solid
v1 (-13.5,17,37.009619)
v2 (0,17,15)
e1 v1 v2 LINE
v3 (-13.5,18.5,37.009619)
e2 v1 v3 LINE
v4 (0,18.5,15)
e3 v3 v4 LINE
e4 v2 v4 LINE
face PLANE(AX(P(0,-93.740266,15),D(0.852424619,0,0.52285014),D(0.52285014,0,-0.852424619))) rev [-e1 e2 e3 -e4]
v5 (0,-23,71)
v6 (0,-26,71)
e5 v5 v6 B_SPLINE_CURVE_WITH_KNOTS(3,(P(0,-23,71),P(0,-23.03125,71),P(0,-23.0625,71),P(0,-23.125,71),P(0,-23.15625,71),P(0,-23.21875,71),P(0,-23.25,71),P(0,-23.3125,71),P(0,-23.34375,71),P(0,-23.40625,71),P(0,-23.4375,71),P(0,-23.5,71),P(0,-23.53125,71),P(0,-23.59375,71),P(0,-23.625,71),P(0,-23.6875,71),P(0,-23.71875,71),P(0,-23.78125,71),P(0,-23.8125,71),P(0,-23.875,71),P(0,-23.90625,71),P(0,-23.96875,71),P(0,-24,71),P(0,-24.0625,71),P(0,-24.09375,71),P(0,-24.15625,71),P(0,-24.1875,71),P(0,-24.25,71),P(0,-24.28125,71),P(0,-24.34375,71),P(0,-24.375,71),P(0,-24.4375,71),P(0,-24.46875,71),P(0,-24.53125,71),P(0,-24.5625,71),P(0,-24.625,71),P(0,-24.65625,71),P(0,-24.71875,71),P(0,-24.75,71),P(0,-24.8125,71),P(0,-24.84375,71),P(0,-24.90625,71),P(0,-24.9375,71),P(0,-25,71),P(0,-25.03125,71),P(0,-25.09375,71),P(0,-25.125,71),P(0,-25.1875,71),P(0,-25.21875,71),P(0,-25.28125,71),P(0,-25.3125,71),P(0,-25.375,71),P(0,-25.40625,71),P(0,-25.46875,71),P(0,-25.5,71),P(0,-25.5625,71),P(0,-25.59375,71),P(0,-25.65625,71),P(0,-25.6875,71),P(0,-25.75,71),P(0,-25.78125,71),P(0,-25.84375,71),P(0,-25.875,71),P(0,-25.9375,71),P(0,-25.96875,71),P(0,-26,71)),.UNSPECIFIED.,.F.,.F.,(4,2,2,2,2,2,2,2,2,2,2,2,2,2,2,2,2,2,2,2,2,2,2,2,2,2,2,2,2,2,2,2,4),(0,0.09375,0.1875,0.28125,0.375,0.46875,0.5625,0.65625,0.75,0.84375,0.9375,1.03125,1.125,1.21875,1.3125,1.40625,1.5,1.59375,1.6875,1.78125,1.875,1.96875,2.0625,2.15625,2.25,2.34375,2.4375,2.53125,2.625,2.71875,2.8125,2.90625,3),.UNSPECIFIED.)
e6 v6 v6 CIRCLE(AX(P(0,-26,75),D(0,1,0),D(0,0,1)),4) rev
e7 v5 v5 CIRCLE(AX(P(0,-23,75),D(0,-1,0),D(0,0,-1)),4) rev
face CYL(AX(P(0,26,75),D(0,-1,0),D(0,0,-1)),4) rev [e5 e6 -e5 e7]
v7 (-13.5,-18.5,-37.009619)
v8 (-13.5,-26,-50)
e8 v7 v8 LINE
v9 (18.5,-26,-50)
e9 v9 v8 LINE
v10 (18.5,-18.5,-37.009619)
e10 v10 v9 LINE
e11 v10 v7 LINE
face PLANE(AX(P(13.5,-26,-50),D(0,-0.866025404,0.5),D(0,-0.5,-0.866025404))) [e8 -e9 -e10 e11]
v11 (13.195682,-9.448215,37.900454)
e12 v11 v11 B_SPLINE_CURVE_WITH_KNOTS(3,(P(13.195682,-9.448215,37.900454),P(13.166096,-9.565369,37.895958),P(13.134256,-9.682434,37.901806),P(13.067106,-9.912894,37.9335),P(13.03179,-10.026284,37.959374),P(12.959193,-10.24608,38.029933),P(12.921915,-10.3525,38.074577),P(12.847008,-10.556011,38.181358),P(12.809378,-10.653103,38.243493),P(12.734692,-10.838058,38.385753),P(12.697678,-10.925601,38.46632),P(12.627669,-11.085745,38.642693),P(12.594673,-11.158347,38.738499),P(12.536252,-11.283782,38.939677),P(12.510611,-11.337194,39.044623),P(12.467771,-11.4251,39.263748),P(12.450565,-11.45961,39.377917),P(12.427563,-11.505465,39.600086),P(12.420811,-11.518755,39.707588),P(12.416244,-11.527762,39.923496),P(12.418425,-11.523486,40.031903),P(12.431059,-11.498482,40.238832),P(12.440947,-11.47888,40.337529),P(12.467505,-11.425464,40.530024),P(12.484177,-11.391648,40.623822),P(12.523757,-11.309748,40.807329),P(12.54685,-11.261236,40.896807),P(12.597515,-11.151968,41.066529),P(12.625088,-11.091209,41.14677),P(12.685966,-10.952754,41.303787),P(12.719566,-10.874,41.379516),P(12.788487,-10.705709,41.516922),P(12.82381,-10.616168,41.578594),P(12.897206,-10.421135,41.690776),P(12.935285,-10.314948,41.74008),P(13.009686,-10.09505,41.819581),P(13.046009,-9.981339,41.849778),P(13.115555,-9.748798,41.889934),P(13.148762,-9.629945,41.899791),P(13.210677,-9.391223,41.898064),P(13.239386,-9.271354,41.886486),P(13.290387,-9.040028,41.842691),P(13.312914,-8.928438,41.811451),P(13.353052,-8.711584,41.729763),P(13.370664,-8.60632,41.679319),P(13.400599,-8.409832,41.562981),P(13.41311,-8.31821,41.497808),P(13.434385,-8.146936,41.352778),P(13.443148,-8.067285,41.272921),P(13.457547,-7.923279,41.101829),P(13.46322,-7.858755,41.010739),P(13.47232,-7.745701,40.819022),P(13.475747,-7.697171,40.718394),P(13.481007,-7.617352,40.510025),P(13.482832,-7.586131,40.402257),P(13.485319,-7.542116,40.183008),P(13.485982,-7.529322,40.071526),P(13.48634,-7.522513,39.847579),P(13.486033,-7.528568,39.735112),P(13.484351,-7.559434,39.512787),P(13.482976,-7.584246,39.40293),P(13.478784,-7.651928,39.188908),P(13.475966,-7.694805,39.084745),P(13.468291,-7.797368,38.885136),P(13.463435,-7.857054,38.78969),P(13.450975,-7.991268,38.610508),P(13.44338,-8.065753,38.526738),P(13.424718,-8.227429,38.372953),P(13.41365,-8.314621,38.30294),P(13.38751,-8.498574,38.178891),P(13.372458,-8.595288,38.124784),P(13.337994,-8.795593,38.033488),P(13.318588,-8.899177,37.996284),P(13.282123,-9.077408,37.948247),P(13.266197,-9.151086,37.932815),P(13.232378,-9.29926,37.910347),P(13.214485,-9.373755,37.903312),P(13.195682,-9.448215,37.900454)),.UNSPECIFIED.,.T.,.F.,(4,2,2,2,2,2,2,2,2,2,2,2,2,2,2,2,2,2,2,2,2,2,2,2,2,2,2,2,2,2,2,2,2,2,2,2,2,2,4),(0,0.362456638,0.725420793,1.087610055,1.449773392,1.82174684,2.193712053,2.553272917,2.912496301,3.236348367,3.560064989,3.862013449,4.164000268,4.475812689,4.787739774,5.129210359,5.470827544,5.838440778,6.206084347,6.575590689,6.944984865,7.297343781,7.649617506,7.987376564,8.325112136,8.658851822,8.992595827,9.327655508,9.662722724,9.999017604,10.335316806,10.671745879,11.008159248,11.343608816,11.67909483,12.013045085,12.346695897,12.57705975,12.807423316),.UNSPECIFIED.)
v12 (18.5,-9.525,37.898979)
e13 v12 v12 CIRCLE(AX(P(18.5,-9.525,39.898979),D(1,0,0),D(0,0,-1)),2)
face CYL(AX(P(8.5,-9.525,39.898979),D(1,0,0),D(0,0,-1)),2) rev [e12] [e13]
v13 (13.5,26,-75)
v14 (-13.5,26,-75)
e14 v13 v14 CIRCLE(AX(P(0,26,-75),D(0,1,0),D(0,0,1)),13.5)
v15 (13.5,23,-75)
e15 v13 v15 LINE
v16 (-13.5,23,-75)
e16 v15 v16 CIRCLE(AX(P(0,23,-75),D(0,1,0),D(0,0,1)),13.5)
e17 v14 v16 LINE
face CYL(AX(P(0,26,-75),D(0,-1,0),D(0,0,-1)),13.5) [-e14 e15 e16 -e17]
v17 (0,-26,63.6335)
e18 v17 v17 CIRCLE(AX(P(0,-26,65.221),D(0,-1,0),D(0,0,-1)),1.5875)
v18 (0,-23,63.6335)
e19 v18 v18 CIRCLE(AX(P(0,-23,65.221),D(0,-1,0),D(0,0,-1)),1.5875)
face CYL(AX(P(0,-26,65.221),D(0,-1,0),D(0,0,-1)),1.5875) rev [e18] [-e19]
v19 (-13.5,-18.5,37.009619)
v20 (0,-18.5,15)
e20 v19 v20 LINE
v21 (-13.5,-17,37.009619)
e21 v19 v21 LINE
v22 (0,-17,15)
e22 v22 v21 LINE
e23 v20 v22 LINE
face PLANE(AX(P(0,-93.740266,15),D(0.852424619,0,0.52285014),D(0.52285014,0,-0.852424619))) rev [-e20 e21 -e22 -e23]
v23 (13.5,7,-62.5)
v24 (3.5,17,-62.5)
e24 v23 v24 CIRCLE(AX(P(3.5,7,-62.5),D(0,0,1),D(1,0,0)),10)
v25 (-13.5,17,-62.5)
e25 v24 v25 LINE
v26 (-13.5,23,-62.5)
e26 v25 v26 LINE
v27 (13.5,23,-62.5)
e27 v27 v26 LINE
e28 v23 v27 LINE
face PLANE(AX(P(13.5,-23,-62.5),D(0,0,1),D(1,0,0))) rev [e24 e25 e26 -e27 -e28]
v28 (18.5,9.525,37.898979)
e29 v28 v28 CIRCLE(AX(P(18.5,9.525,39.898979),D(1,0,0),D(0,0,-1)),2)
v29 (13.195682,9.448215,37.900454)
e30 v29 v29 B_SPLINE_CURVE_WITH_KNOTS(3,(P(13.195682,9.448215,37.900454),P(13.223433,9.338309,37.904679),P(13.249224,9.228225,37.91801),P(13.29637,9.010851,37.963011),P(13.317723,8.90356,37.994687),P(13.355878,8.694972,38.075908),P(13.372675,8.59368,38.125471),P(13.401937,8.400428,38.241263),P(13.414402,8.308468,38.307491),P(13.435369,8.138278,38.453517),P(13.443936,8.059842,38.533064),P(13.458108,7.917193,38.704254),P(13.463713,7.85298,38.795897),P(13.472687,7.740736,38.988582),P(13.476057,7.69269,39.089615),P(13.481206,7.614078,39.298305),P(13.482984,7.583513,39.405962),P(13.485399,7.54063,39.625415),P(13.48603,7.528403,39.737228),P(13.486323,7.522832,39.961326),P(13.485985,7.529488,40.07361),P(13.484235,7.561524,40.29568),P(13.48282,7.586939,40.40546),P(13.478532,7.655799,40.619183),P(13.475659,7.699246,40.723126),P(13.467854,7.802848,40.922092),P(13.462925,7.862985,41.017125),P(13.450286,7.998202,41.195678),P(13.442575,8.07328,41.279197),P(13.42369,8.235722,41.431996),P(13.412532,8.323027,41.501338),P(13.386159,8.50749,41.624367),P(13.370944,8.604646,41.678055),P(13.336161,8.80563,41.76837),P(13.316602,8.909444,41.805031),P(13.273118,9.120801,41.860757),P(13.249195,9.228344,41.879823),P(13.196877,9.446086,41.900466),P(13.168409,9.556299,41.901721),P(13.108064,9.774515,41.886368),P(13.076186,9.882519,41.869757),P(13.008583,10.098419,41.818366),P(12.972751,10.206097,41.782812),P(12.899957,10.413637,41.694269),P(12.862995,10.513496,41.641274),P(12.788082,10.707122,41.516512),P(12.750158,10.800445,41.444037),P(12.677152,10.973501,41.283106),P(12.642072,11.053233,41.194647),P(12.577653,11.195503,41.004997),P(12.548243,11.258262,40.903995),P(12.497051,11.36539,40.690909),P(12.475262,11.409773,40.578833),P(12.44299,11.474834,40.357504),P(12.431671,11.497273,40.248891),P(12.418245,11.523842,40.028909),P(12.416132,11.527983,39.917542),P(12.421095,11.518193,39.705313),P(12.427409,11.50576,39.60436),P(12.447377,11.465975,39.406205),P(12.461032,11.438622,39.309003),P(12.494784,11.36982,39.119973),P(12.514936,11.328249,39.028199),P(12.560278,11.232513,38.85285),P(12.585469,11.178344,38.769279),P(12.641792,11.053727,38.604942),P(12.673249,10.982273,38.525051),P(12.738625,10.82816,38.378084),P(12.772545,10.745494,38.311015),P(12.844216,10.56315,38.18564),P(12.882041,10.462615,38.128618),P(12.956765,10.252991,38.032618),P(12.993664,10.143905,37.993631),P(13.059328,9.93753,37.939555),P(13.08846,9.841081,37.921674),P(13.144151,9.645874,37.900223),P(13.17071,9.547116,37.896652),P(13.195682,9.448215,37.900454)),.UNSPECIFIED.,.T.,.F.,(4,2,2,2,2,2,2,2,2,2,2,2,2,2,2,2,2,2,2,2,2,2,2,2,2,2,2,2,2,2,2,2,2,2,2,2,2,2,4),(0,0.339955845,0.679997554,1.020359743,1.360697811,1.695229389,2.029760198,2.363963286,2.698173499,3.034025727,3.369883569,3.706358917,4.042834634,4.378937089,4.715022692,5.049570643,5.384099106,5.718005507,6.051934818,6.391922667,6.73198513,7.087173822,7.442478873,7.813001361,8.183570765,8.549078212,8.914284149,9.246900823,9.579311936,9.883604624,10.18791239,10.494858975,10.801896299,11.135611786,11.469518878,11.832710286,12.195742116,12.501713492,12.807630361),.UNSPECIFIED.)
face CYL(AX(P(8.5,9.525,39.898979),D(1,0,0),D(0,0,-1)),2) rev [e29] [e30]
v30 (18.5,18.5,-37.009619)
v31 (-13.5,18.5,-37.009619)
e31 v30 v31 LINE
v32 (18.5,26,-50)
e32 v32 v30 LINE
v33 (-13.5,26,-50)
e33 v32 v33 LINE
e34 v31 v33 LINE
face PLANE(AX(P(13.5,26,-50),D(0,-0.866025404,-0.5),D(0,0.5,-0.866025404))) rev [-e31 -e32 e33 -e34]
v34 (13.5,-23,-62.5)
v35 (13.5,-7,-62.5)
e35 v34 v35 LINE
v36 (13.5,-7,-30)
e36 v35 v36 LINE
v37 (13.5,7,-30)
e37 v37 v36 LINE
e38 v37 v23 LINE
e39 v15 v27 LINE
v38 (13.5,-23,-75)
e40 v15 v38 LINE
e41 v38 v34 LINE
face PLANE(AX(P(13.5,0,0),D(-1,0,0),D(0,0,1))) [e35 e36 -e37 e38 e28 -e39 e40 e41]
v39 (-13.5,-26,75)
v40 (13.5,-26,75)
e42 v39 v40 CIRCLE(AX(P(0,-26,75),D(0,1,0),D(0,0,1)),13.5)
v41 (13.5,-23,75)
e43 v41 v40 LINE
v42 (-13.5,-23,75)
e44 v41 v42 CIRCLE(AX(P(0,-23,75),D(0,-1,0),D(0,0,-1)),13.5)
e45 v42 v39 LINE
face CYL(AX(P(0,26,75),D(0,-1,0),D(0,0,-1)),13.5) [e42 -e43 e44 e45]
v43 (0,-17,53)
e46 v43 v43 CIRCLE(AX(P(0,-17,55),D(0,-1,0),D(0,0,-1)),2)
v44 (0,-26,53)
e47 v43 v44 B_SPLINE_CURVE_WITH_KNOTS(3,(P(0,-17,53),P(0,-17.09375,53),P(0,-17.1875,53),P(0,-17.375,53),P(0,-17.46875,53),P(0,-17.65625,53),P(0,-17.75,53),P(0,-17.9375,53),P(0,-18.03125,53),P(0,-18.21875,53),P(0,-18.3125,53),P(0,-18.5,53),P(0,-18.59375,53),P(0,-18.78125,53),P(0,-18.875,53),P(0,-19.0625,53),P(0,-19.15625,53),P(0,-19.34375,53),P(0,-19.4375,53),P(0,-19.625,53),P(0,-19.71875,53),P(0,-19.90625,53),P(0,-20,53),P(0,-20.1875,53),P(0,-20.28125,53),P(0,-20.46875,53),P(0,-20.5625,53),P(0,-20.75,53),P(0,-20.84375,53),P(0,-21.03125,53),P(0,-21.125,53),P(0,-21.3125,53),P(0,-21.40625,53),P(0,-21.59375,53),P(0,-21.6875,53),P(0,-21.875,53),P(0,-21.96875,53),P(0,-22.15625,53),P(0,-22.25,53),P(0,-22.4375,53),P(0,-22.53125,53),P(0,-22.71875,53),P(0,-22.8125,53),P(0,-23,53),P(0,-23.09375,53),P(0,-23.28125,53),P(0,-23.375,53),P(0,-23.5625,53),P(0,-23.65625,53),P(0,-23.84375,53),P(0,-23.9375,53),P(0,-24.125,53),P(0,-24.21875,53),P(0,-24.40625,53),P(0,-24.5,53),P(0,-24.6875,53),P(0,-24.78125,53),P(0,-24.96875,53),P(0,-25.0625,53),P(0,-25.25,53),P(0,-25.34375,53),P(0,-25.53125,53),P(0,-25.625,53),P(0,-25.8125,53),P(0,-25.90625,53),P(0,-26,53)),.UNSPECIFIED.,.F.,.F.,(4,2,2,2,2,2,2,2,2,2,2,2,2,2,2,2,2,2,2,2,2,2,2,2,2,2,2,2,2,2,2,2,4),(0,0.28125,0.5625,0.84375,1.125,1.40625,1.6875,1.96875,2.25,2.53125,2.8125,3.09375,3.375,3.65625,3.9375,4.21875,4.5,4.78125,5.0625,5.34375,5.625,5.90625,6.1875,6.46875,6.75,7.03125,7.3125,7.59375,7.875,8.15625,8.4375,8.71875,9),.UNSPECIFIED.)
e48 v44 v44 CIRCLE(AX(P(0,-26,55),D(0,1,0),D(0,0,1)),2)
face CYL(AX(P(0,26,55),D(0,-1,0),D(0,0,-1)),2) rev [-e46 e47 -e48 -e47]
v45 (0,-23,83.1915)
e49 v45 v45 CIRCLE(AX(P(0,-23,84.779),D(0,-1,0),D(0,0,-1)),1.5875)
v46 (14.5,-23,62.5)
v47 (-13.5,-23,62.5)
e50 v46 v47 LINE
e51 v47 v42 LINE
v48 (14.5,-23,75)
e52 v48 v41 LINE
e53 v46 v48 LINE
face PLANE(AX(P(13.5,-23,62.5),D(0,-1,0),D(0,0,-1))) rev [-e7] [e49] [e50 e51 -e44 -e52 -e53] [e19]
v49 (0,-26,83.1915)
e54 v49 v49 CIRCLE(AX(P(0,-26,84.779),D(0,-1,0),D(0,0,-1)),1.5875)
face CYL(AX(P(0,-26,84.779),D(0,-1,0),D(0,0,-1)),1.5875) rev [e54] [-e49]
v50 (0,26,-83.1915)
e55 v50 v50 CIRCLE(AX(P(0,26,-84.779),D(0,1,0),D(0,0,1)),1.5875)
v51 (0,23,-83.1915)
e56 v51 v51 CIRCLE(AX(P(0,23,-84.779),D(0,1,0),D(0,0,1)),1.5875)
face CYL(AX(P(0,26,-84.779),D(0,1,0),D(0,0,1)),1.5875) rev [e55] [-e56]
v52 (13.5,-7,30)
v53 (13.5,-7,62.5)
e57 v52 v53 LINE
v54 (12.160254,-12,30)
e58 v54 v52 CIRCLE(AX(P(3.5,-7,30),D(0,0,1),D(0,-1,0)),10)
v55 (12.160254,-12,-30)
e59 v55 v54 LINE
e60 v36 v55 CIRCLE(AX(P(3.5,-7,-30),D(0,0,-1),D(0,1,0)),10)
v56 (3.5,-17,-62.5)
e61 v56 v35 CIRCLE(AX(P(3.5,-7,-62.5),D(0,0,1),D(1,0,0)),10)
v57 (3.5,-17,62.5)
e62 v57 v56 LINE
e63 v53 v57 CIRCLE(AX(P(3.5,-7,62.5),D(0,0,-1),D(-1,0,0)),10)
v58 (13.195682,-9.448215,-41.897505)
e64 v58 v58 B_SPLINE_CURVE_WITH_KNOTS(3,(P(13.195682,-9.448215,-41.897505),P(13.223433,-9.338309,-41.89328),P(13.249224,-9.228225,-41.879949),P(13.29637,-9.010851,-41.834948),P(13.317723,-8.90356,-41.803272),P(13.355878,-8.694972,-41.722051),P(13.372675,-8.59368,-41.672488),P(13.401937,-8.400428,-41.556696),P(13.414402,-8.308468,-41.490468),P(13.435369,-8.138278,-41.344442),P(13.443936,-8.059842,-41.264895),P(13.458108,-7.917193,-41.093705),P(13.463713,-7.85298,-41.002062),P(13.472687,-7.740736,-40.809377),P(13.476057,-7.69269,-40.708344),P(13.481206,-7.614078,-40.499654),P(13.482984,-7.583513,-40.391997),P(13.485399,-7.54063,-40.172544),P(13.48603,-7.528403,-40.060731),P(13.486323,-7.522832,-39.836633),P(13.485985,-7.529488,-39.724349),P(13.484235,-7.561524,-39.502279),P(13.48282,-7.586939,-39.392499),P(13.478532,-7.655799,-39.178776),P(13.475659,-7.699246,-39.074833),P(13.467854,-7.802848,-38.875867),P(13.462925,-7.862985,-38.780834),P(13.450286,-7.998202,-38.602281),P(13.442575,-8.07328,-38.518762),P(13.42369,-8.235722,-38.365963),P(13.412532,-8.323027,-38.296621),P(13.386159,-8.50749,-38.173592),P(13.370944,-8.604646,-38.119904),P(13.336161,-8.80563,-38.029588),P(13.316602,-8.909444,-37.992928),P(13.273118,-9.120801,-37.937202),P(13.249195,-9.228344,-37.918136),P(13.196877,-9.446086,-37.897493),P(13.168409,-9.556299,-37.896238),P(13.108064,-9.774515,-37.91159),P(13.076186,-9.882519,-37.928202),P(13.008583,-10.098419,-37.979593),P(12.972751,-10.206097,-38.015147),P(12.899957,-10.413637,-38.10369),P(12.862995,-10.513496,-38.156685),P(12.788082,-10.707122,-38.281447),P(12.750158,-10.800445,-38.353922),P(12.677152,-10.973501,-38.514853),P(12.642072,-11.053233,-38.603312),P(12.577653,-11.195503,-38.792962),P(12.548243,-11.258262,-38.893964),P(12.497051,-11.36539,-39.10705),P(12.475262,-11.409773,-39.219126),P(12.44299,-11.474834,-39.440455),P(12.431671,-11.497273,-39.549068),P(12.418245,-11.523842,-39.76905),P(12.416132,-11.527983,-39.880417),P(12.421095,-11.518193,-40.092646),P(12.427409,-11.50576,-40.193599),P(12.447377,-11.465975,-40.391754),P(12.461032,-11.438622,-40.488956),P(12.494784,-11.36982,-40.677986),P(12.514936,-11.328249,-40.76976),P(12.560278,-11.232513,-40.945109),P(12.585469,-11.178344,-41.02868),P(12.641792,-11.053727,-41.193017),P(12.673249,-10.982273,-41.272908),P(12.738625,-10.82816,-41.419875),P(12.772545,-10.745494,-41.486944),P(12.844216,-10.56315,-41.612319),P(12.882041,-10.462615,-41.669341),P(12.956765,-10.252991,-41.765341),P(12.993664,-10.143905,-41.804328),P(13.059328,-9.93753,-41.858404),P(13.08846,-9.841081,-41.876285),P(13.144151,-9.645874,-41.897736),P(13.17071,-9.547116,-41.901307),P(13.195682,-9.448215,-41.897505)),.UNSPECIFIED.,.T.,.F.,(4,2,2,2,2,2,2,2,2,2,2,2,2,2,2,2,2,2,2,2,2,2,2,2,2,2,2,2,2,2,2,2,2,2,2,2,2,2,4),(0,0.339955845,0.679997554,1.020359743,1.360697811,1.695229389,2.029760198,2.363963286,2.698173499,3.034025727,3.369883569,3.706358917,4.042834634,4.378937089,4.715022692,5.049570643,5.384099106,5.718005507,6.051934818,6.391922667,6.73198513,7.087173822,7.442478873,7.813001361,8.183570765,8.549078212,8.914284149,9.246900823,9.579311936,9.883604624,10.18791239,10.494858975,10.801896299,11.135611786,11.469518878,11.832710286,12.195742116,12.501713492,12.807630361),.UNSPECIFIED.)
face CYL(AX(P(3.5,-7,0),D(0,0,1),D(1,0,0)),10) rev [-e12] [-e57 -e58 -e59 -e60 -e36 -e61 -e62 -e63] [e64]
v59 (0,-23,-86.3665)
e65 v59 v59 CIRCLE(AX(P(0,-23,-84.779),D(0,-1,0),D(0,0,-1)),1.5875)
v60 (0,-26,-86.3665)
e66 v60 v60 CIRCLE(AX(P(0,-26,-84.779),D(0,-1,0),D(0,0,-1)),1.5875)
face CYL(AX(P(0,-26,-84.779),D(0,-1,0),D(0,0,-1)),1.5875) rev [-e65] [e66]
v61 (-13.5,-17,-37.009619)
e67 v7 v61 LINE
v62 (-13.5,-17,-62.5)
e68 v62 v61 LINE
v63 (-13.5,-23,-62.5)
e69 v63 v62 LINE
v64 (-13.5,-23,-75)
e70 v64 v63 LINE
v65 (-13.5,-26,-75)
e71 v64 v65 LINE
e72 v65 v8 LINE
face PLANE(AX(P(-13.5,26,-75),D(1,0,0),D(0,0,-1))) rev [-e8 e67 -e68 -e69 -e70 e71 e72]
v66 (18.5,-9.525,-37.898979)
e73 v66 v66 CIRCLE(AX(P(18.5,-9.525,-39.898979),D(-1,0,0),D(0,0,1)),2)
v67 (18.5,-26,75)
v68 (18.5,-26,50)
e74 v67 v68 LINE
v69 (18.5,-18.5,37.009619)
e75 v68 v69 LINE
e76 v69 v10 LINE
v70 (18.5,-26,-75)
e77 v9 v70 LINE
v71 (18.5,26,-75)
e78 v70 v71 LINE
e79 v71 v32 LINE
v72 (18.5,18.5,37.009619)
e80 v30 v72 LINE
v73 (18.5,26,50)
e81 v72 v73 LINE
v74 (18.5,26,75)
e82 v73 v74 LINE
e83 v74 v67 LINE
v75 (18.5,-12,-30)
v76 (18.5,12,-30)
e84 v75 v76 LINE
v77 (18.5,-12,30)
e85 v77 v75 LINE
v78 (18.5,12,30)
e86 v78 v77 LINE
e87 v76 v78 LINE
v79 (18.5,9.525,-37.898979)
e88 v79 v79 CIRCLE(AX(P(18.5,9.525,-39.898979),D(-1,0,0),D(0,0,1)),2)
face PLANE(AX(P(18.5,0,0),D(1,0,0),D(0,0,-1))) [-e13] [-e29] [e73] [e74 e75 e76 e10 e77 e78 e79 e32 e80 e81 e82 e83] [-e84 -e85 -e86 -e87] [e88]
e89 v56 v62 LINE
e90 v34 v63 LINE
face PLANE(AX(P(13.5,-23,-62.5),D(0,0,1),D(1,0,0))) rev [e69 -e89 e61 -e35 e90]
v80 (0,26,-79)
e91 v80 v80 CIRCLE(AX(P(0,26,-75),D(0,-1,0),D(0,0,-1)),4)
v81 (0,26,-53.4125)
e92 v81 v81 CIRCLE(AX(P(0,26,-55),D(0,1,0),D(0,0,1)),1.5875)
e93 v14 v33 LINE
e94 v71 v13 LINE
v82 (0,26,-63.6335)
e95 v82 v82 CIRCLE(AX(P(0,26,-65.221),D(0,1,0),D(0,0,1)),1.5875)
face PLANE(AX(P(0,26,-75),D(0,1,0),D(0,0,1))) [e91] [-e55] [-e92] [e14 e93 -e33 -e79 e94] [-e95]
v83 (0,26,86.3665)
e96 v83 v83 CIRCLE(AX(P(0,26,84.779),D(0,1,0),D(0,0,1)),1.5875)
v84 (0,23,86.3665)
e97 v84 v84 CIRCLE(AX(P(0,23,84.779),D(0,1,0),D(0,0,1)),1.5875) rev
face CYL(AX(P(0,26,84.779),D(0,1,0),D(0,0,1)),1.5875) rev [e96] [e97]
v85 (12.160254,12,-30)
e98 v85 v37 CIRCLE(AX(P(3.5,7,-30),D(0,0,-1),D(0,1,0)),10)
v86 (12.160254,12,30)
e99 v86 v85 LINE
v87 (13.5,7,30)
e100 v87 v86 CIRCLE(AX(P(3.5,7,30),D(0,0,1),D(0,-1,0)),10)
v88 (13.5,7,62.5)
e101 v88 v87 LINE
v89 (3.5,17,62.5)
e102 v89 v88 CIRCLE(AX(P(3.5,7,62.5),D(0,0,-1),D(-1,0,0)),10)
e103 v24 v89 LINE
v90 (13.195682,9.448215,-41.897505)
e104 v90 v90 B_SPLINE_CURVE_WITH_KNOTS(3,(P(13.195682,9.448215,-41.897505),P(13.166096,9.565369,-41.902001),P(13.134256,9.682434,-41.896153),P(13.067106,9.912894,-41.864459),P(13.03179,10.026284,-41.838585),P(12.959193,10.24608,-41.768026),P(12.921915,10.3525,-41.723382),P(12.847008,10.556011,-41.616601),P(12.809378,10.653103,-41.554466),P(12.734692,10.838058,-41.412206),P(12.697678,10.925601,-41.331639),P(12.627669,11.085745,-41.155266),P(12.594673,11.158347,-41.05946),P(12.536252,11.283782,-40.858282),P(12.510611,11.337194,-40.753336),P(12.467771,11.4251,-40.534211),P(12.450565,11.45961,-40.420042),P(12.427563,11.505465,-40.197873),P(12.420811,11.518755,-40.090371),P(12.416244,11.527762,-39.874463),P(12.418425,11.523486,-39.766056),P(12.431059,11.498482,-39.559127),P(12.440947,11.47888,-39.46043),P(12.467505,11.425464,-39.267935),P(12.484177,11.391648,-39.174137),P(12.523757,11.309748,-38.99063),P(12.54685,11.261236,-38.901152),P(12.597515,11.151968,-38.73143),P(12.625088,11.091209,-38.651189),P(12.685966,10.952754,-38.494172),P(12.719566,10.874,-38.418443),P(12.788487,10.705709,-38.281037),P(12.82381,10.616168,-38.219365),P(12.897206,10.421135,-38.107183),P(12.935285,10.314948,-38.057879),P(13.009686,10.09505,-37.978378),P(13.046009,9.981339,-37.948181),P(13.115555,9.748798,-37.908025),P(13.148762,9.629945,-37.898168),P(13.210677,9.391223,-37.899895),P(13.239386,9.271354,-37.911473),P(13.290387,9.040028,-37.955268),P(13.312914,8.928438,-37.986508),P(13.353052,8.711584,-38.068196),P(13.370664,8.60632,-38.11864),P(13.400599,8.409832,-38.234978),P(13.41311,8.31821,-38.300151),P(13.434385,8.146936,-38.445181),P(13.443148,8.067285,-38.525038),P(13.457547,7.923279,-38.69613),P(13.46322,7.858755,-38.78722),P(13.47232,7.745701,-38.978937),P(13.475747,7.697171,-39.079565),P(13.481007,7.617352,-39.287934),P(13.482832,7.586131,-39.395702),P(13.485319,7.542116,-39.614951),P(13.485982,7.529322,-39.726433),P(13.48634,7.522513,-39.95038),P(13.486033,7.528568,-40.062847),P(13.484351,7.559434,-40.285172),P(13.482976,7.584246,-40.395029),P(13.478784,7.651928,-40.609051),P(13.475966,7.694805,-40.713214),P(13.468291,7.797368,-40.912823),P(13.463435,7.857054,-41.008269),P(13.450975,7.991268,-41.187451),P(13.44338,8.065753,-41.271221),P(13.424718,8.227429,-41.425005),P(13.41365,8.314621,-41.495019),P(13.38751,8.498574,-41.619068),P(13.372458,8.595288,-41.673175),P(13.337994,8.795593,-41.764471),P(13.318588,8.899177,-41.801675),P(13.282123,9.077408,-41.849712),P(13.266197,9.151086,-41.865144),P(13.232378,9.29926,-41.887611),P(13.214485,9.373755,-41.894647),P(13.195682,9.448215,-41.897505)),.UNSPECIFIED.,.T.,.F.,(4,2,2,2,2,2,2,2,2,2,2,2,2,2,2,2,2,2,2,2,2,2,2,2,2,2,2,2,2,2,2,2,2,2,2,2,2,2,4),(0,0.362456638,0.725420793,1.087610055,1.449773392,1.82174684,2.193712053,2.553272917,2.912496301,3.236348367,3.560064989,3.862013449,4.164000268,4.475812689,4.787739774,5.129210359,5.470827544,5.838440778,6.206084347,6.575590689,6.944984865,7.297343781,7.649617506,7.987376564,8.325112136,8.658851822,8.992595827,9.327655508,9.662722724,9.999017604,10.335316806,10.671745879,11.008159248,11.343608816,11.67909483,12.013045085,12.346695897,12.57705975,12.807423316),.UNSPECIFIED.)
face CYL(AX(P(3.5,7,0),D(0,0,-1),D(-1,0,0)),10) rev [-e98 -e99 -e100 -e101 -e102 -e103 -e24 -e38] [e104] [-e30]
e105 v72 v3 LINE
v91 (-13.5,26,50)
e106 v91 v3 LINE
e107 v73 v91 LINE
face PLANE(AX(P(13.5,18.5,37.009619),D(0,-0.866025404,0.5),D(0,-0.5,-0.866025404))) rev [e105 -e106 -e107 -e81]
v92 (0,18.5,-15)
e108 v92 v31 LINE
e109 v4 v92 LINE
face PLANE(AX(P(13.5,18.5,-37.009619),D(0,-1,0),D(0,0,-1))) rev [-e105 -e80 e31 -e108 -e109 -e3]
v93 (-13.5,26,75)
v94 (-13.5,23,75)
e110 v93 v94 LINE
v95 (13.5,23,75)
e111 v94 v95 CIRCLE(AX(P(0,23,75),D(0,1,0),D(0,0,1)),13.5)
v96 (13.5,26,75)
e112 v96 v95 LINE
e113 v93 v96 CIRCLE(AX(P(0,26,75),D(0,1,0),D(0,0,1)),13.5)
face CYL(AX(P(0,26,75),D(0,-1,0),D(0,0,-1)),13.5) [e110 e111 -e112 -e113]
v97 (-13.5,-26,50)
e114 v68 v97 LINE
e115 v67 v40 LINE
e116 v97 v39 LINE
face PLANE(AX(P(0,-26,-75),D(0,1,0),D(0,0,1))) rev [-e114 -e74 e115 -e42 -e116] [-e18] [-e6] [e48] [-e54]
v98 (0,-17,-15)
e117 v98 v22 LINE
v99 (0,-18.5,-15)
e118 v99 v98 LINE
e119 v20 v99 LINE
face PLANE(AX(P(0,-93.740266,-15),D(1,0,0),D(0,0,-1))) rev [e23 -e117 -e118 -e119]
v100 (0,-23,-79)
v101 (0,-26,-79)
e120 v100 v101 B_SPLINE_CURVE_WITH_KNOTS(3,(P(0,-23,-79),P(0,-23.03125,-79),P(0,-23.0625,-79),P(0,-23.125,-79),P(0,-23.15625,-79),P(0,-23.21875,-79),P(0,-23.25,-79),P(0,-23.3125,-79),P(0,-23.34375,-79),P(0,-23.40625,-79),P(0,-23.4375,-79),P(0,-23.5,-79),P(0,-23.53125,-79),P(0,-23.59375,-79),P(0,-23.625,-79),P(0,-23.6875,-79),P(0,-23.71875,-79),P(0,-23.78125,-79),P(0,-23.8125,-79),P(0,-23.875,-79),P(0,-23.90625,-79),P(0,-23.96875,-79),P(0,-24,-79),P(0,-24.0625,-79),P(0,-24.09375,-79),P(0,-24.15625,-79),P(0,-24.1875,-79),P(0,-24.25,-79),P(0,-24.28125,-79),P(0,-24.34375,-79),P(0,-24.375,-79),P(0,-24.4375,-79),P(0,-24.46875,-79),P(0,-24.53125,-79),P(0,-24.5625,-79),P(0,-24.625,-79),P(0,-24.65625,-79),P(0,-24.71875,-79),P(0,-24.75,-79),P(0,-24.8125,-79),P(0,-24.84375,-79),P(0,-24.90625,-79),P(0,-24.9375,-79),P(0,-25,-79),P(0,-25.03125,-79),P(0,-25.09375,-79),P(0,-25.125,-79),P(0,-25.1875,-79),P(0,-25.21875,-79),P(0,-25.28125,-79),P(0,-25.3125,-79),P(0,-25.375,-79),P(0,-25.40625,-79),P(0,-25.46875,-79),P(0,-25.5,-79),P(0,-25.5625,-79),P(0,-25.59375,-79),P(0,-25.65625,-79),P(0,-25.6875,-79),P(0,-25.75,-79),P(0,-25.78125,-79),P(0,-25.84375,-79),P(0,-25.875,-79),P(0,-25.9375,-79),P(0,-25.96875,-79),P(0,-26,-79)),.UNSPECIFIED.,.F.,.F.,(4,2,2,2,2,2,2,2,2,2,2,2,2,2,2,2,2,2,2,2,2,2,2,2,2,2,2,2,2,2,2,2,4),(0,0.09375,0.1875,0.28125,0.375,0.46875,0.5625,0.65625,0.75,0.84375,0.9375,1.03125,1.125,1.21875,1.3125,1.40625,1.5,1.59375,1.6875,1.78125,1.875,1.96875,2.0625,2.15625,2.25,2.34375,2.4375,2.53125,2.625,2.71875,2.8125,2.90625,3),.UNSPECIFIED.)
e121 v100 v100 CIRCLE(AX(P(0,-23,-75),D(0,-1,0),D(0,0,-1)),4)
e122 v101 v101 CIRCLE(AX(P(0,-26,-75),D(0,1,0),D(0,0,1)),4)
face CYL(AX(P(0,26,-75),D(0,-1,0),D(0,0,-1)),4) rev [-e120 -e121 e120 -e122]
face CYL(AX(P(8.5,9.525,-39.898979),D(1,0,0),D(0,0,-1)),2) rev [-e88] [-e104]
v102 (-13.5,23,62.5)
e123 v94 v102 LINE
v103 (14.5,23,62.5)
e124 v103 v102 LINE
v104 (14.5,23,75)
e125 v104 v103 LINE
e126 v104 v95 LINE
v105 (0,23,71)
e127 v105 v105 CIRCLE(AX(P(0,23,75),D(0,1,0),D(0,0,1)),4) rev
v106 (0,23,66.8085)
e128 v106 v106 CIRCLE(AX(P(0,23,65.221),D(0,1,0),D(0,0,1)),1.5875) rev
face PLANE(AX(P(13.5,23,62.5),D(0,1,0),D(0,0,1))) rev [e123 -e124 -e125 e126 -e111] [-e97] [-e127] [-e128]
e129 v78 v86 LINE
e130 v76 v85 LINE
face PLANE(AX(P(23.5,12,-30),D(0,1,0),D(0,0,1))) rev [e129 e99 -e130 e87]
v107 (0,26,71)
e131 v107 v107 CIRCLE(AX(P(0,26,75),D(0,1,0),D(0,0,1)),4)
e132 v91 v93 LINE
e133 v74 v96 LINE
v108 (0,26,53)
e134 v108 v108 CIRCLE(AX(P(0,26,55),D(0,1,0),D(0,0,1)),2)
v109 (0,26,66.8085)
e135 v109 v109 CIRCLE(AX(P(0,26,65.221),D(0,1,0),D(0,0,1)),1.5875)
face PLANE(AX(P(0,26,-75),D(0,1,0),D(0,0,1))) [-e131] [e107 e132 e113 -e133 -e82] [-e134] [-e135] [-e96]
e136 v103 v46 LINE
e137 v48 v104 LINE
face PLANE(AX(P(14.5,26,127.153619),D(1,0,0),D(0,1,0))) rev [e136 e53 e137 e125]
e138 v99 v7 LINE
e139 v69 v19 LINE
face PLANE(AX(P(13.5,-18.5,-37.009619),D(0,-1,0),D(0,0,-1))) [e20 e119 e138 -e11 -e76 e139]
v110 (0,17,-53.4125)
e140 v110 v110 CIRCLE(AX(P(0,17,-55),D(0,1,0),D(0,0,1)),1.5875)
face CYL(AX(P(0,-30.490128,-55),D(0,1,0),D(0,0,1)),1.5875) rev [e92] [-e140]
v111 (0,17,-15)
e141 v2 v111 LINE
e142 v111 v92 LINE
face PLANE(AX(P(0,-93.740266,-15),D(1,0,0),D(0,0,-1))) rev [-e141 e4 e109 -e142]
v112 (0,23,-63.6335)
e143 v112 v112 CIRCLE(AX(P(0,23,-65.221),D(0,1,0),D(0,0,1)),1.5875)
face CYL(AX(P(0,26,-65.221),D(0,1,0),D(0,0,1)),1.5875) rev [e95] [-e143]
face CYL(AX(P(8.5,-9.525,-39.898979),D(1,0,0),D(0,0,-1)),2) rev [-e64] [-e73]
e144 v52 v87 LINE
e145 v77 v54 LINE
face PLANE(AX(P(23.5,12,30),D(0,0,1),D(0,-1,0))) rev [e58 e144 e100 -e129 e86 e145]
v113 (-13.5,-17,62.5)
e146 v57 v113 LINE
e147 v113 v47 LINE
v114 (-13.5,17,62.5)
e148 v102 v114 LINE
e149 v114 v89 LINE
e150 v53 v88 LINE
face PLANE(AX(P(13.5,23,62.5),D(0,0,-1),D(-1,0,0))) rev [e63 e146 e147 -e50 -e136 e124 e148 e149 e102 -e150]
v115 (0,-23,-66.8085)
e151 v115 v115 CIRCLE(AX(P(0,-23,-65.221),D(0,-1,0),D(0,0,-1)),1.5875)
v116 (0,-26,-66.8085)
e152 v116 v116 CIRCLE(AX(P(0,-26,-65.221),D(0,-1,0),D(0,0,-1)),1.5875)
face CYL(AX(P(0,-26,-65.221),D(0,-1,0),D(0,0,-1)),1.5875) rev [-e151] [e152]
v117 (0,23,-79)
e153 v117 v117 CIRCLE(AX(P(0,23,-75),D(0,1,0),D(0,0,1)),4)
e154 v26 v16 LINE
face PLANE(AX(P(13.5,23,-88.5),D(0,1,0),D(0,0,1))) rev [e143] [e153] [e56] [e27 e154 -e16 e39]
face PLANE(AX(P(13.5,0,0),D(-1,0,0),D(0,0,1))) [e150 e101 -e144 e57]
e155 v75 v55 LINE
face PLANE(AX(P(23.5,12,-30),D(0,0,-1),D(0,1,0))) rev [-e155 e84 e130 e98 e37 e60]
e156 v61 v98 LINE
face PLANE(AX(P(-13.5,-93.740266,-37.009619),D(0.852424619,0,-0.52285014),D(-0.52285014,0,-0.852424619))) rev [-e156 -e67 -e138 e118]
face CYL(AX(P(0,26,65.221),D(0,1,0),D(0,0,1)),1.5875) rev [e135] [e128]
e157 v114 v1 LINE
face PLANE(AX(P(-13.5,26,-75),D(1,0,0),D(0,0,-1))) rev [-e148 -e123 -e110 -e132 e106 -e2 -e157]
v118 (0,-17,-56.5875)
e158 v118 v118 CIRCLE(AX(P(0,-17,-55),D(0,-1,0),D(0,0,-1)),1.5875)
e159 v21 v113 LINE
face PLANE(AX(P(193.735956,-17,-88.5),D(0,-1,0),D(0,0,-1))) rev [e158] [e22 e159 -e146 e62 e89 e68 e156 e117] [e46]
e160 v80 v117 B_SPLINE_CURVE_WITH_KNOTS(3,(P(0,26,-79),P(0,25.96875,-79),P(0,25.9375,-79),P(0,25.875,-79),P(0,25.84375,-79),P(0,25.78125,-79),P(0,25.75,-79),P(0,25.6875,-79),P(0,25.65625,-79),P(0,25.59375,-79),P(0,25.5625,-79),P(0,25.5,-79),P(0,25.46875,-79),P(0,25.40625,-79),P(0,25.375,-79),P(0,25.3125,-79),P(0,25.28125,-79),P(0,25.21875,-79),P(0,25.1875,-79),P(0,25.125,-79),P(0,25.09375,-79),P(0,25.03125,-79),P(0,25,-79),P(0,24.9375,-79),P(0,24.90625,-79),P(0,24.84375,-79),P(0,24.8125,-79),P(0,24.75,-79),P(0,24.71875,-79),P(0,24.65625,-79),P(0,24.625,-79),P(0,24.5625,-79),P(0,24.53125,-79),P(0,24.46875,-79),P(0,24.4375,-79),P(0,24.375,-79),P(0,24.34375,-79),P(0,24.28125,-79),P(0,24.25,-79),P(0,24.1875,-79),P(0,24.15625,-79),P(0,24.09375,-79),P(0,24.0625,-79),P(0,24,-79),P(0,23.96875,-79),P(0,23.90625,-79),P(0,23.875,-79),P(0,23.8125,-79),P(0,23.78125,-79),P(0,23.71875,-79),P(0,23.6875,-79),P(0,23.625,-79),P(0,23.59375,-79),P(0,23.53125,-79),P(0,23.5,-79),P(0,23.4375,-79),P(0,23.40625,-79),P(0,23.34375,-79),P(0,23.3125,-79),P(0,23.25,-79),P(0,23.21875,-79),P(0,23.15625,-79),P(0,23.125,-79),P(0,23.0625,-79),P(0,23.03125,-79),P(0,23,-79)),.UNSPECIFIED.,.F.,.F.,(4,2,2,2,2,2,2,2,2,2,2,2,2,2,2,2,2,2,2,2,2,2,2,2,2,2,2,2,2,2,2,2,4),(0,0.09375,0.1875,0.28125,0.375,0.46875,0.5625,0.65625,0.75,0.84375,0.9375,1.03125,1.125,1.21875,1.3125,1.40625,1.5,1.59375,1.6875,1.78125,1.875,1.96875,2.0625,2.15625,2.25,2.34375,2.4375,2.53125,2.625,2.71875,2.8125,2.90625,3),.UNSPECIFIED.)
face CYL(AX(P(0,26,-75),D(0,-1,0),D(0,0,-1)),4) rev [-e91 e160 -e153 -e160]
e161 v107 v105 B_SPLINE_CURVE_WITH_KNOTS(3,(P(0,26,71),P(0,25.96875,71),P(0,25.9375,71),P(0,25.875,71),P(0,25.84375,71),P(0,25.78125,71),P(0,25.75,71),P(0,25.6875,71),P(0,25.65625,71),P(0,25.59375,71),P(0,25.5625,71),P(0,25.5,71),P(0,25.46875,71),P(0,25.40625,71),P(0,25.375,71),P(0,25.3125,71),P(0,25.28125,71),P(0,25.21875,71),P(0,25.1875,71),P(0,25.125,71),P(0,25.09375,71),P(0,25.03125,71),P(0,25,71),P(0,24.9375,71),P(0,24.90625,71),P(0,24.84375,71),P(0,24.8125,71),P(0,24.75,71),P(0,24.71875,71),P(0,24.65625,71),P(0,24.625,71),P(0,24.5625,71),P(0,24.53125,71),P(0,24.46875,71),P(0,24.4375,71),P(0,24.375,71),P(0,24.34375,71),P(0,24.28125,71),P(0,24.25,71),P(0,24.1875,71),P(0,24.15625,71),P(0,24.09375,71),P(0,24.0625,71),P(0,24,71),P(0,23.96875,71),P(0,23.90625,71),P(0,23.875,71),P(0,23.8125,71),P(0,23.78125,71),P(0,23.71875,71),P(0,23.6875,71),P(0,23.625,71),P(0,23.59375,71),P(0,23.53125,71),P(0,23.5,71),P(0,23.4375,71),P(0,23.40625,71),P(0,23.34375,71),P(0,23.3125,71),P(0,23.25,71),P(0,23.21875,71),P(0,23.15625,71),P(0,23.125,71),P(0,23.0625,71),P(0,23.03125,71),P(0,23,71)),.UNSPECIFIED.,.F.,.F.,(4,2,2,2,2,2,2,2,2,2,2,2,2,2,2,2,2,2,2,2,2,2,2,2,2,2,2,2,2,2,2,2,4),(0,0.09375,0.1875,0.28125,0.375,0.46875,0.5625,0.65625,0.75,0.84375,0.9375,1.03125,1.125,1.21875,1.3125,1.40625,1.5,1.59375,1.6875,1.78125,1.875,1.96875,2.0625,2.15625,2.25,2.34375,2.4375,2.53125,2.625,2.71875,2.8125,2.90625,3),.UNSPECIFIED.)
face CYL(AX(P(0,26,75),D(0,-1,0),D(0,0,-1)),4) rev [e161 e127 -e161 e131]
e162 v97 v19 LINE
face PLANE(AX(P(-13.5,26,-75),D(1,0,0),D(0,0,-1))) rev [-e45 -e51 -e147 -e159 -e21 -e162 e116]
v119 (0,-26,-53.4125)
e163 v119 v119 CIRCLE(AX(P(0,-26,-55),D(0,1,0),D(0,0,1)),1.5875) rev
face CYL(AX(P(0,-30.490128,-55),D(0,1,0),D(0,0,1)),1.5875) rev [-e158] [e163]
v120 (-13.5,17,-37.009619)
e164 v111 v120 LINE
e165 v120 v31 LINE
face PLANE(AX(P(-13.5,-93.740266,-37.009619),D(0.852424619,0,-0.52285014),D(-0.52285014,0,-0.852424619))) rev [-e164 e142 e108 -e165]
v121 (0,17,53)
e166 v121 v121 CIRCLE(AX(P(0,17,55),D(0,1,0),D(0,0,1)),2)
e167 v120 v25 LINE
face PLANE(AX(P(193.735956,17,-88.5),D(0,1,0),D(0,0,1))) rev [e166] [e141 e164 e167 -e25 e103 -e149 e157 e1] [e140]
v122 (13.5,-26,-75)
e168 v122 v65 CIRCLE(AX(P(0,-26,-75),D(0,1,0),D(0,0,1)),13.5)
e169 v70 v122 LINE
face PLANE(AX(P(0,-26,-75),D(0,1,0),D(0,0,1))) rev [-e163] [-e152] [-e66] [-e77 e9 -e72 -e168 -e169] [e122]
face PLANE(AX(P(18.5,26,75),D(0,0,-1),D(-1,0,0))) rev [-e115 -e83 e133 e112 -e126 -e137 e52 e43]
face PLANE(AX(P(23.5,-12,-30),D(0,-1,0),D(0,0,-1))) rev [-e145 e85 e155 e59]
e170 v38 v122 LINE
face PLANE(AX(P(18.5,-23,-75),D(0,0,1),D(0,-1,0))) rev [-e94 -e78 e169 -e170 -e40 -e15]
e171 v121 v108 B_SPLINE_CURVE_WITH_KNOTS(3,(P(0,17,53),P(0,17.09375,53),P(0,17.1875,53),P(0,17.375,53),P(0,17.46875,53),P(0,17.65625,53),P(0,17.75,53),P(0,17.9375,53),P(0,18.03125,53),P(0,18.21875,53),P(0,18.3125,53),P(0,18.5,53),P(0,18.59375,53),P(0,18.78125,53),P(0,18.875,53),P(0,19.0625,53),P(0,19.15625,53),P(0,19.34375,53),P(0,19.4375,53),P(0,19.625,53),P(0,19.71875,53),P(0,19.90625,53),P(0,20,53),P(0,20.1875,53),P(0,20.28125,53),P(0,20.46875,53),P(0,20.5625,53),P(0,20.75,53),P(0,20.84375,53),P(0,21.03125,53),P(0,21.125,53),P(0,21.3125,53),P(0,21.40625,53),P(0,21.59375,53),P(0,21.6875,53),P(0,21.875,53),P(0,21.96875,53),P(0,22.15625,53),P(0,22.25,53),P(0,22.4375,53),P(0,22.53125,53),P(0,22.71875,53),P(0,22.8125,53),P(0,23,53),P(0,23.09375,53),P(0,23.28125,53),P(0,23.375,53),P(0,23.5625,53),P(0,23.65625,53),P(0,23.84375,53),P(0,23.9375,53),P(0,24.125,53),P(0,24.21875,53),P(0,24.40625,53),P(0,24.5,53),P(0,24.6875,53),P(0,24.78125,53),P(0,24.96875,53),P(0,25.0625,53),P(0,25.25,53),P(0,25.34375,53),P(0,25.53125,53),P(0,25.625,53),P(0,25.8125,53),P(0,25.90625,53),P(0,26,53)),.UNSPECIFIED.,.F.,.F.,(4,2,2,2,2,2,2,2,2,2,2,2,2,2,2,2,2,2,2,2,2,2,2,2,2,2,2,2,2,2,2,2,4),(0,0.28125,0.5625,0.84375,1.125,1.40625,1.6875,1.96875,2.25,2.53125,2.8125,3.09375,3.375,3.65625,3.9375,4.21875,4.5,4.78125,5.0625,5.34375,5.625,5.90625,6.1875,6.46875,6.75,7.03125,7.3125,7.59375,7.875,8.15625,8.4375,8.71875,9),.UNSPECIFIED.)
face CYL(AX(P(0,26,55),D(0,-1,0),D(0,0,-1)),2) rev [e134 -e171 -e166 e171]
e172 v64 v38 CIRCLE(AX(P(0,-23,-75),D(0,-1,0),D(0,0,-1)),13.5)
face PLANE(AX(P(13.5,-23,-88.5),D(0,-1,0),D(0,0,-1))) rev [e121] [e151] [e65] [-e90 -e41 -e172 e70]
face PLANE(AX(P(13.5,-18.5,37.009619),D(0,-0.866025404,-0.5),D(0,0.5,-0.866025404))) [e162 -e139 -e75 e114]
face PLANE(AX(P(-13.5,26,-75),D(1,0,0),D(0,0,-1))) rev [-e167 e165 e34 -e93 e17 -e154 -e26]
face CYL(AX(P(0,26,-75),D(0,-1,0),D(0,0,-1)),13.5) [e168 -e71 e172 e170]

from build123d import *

# Parameters (mm, degrees)
SKETCH1_R                             = 2
BOSS_EXTRUDE1_DEPTH                   = 26
CUT_EXTRUDE1_DEPTH                    = 97.110613358
CUT_EXTRUDE2_DEPTH                    = 97.110613358
CUT_EXTRUDE2_DEPTH_BACK               = 97.110613358
SKETCH4_W                             = 26
SKETCH4_H                             = 6
SKETCH5_W                             = 177
SKETCH5_H                             = 34
CUT_EXTRUDE3_DEPTH                    = 22
SKETCH6_W                             = 22.988088482
SKETCH6_H                             = 34
CUT_EXTRUDE4_DEPTH                    = 95.827474922
SKETCH7_W                             = 22.988088482
SKETCH7_H                             = 34
CUT_EXTRUDE5_DEPTH                    = 95.827474922
F_1_8_0_125_DIAMETER_HOLE1_AT_2_COUNT = 2
F_1_8_0_125_DIAMETER_HOLE1_AT_2_PITCH = 19.558
SKETCH13_R                            = 4
CUT_EXTRUDE6_DEPTH                    = 104.530188834
BOSS_EXTRUDE2_DEPTH                   = 5
SKETCH15_W                            = 125
SKETCH15_H                            = 34
CUT_EXTRUDE7_DEPTH                    = 5
SKETCH17_W                            = 4
SKETCH17_H                            = 52
BOSS_EXTRUDE4_DEPTH                   = 12.5
SKETCH19_R                            = 2
CUT_EXTRUDE11_DEPTH                   = 10
CUT_EXTRUDE8_REACH                    = 106.3
SKETCH18_R                            = 1.5875
SKETCH20_W                            = 60
SKETCH20_H                            = 24
CUT_EXTRUDE10_DEPTH                   = 10
CUT_EXTRUDE12_REACH                   = 102.771
SKETCH22_W                            = 5
SKETCH22_H                            = 46
BOSS_EXTRUDE5_DEPTH                   = 12.5
FILLET1_R                             = 10


with BuildPart() as part:
    # Sketch1 → Boss-Extrude1 (new, symmetric)
    with BuildSketch(Plane(origin=(0, 0, 0), x_dir=(1, 0, 0), z_dir=(0, 1, 0))):
        with BuildLine():
            Line((-13.5, 75), (-13.5, -75))
            ThreePointArc((-13.5, -75), (0, -88.5), (13.5, -75))
            Line((13.5, -75), (13.5, 75))
            ThreePointArc((13.5, 75), (0, 88.5), (-13.5, 75))
        make_face()
        with Locations(Location((0, -55, 0), (0, 0, 90))):
            Circle(SKETCH1_R, mode=Mode.SUBTRACT)
    extrude(amount=BOSS_EXTRUDE1_DEPTH, both=True)

    # Sketch3 → Cut-Extrude1 (cut, symmetric)
    with BuildSketch(Plane.ZY.offset(13.5)):
        Polygon((-50, 26), (-37.009618943, 18.5), (37.009618943, 18.5), (50, 26), align=None)
    cut_extrude1 = extrude(amount=CUT_EXTRUDE1_DEPTH, both=True, mode=Mode.SUBTRACT)

    # Mirror1: Cut-Extrude1 across plane
    add(cut_extrude1.mirror(Plane.ZX), mode=Mode.SUBTRACT)

    # Sketch4 → Cut-Extrude2 (cut, two sides: drawn at the far end of the back side and taken through both)
    with BuildSketch(Plane.ZY.offset(13.5).offset(-CUT_EXTRUDE2_DEPTH_BACK)):
        with Locations((75.5, 20)):
            Rectangle(SKETCH4_W, SKETCH4_H)
        with Locations((-75.5, 20)):
            Rectangle(SKETCH4_W, SKETCH4_H)
        with Locations((-75.5, -20)):
            Rectangle(SKETCH4_W, SKETCH4_H)
        with Locations((75.5, -20)):
            Rectangle(SKETCH4_W, SKETCH4_H)
    extrude(amount=CUT_EXTRUDE2_DEPTH + CUT_EXTRUDE2_DEPTH_BACK, mode=Mode.SUBTRACT)

    # Sketch5 → Cut-Extrude3 (cut)
    with BuildSketch(Plane.ZY.offset(13.5)):
        Rectangle(SKETCH5_W, SKETCH5_H)
    extrude(amount=-CUT_EXTRUDE3_DEPTH, mode=Mode.SUBTRACT)

    # Sketch6 → Cut-Extrude4 (cut, through all)
    with BuildSketch(Plane.ZY.offset(-8.5)):
        with Locations((73.994044241, 0)):
            Rectangle(SKETCH6_W, SKETCH6_H)
    extrude(amount=-CUT_EXTRUDE4_DEPTH, mode=Mode.SUBTRACT)

    # Sketch7 → Cut-Extrude5 (cut, through all)
    with BuildSketch(Plane.ZY.offset(-8.5)):
        with Locations((-73.994044241, 0)):
            Rectangle(SKETCH7_W, SKETCH7_H)
    extrude(amount=-CUT_EXTRUDE5_DEPTH, mode=Mode.SUBTRACT)

    # Sketch12 → 1/8 (0.125) Diameter Hole1 (revolve, cut)
    with BuildSketch(Plane(origin=(0, 26, 65.221), x_dir=(0, 0, 1), z_dir=(1, 0, 0))):
        Polygon((0, 0), (0, 3.953866233), (1.5875, 3), (1.5875, 0), align=None)
    f_1_8_0_125_diameter_hole1 = revolve(axis=Axis((0, 32.35, 65.221), (0, -1, 0)), mode=Mode.SUBTRACT)

    # 1/8 (0.125) Diameter Hole1 at 2: 1/8 (0.125) Diameter Hole1 ×2
    with Locations(*[(0, 0, i * F_1_8_0_125_DIAMETER_HOLE1_AT_2_PITCH) for i in range(1, F_1_8_0_125_DIAMETER_HOLE1_AT_2_COUNT)]):
        add(f_1_8_0_125_diameter_hole1, mode=Mode.SUBTRACT)

    # Mirror5: 1/8 (0.125) Diameter Hole1 across plane
    add(f_1_8_0_125_diameter_hole1.mirror(Plane.ZX), mode=Mode.SUBTRACT)

    # Mirror5 copy 1 sketch → Mirror5 copy 1 (revolve, cut)
    with BuildSketch(Plane(origin=(0, -26, 84.779), x_dir=(0, 0, 1), z_dir=(1, 0, 0))):
        Polygon((0, 0), (0, -3.953866233), (1.5875, -3), (1.5875, 0), align=None)
    revolve(axis=Axis((0, -32.35, 84.779), (0, -1, 0)), mode=Mode.SUBTRACT)

    # Mirror3: 1/8 (0.125) Diameter Hole1 across plane
    add(f_1_8_0_125_diameter_hole1.mirror(Plane.XY), mode=Mode.SUBTRACT)

    # Mirror3 copy 1 sketch → Mirror3 copy 1 (revolve, cut)
    with BuildSketch(Plane(origin=(0, 26, -84.779), x_dir=(0, 0, -1), z_dir=(1, 0, 0))):
        Polygon((0, 0), (0, -3.953866233), (1.5875, -3), (1.5875, 0), align=None)
    revolve(axis=Axis((0, 32.35, -84.779), (0, 1, 0)), mode=Mode.SUBTRACT)

    # Sketch13 → Cut-Extrude6 (cut, symmetric)
    with BuildSketch(Plane.XZ.offset(26)):
        with Locations(Location((0, -75, 0), (0, 0, 270))):
            Circle(SKETCH13_R)
    cut_extrude6 = extrude(amount=CUT_EXTRUDE6_DEPTH, both=True, mode=Mode.SUBTRACT)

    # Mirror4: Cut-Extrude6 across plane
    add(cut_extrude6.mirror(Plane.XY), mode=Mode.SUBTRACT)

    # Sketch14 → Boss-Extrude2 (add)
    with BuildSketch(Plane(origin=(13.5, 0, 0), x_dir=(0, 0, -1), z_dir=(1, 0, 0))):
        Polygon((-75, 26), (-75, 23), (-62.5, 23), (-62.5, -23), (-75, -23), (-75, -26), (-50, -26), (-37.009618943, -18.5), (37.009618943, -18.5), (50, -26), (75, -26), (75, -23), (62.5, -23), (62.5, 23), (75, 23), (75, 26), (50, 26), (37.009618943, 18.5), (-37.009618943, 18.5), (-50, 26), align=None)
    extrude(amount=BOSS_EXTRUDE2_DEPTH)

    # Sketch15 → Cut-Extrude7 (cut)
    with BuildSketch(Plane.ZY.offset(-8.5)):
        Rectangle(SKETCH15_W, SKETCH15_H)
    extrude(amount=-CUT_EXTRUDE7_DEPTH, mode=Mode.SUBTRACT)

    # Sketch17 → Boss-Extrude4 (add)
    with BuildSketch(Plane.XY.offset(62.5)):
        with Locations((16.5, 0)):
            Rectangle(SKETCH17_W, SKETCH17_H)
    extrude(amount=BOSS_EXTRUDE4_DEPTH)

    # Mirror6 copy 1 sketch → Mirror6 copy 1 (revolve, cut)
    with BuildSketch(Plane(origin=(0, -26, -65.221), x_dir=(0, 0, -1), z_dir=(1, 0, 0))):
        Polygon((0, 0), (0, 3.953866233), (1.5875, 3), (1.5875, 0), align=None)
    revolve(axis=Axis((0, -32.35, -65.221), (0, 1, 0)), mode=Mode.SUBTRACT)

    # Mirror6 copy 2 sketch → Mirror6 copy 2 (revolve, cut)
    with BuildSketch(Plane(origin=(0, -26, -84.779), x_dir=(0, 0, -1), z_dir=(1, 0, 0))):
        Polygon((0, 0), (0, 3.953866233), (1.5875, 3), (1.5875, 0), align=None)
    revolve(axis=Axis((0, -32.35, -84.779), (0, 1, 0)), mode=Mode.SUBTRACT)

    # Mirror6 copy 3 sketch → Mirror6 copy 3 (revolve, cut)
    with BuildSketch(Plane(origin=(0, -26, 65.221), x_dir=(0, 0, 1), z_dir=(1, 0, 0))):
        Polygon((0, 0), (0, -3.953866233), (1.5875, -3), (1.5875, 0), align=None)
    revolve(axis=Axis((0, -32.35, 65.221), (0, -1, 0)), mode=Mode.SUBTRACT)

    # Mirror6 copy 4 sketch → Mirror6 copy 4 (revolve, cut)
    with BuildSketch(Plane(origin=(0, -26, 84.779), x_dir=(0, 0, 1), z_dir=(1, 0, 0))):
        Polygon((0, 0), (0, -3.953866233), (1.5875, -3), (1.5875, 0), align=None)
    revolve(axis=Axis((0, -32.35, 84.779), (0, -1, 0)), mode=Mode.SUBTRACT)

    # Sketch19 → Cut-Extrude11 (cut)
    with BuildSketch(Plane(origin=(18.5, 0, 0), x_dir=(0, 0, -1), z_dir=(1, 0, 0))):
        with Locations((-39.898979486, 9.525)):
            Circle(SKETCH19_R)
        with Locations((-39.898979486, -9.525)):
            Circle(SKETCH19_R)
    cut_extrude11 = extrude(amount=-CUT_EXTRUDE11_DEPTH, mode=Mode.SUBTRACT)

    # Cut-Extrude8: up to this face of the body (flat: up to its plane)
    cut_extrude8_end = Plane(part.part.faces().sort_by_distance((1.960443083, -26, -66.805592971))[0])
    # Sketch18 → Cut-Extrude8 (cut, up to the picked face)
    with BuildSketch(Plane(origin=(0, 26, 0), x_dir=(1, 0, 0), z_dir=(0, 1, 0)), mode=Mode.PRIVATE) as cut_extrude8_sk1:
        with Locations(Location((0, 55, 0), (0, 0, 270))):
            Circle(SKETCH18_R)
    cut_extrude8_tool1 = split(extrude(cut_extrude8_sk1.sketch, amount=-CUT_EXTRUDE8_REACH, mode=Mode.PRIVATE), bisect_by=cut_extrude8_end, keep=Keep.BOTH, mode=Mode.PRIVATE)
    add(cut_extrude8_tool1.solids().sort_by(Axis((0, 26, -55), (0, -1, 0)))[0], mode=Mode.SUBTRACT)

    # Sketch20 → Cut-Extrude10 (cut)
    with BuildSketch(Plane.ZY.offset(-13.5)):
        Rectangle(SKETCH20_W, SKETCH20_H)
    extrude(amount=-CUT_EXTRUDE10_DEPTH, mode=Mode.SUBTRACT)

    # Mirror7: Cut-Extrude11 across plane
    add(cut_extrude11.mirror(Plane.XY), mode=Mode.SUBTRACT)

    # Sketch21 → Cut-Extrude12 (cut, up to next)
    with BuildSketch(Plane(origin=(0, 18.5, 0), x_dir=(1, 0, 0), z_dir=(0, 1, 0)), mode=Mode.PRIVATE) as cut_extrude12_sk1:
        Polygon((-13.5, 37.009618943), (0, 15), (0, -15), (-13.5, -37.009618943), align=None)
    cut_extrude12_tool1 = extrude(cut_extrude12_sk1.sketch, amount=-CUT_EXTRUDE12_REACH, mode=Mode.PRIVATE) & part.part
    add(cut_extrude12_tool1.solids().sort_by_distance((-7.702163, 18.5, 0))[0], mode=Mode.SUBTRACT)
    add(cut_extrude12_tool1.solids().sort_by_distance((-7.702163, 18.5, 0))[1], mode=Mode.SUBTRACT)

    # Sketch22 → Boss-Extrude5 (add)
    with BuildSketch(Plane(origin=(0, 0, -62.5), x_dir=(-1, 0, 0), z_dir=(0, 0, -1))):
        with Locations((-16, 0)):
            Rectangle(SKETCH22_W, SKETCH22_H)
    extrude(amount=BOSS_EXTRUDE5_DEPTH)

    # Fillet1
    # the kernel refuses this fillet: 10 mm, written as the material it adds along each edge
    with BuildSketch(Plane(origin=(13.5, 17, -62.5), x_dir=(0, -1, 0), z_dir=(0, 0, 1))) as fillet1_piece_1_section:
        with BuildLine():
            CenterArc((FILLET1_R, -FILLET1_R), FILLET1_R, 90, 90)
            Line((0, -FILLET1_R), (0, 0))
            Line((0, 0), (FILLET1_R, 0))
        make_face()
    fillet1_piece_1 = extrude(amount=150, mode=Mode.PRIVATE)
    fillet1_piece_1 = fillet1_piece_1 - Plane(origin=(13.095089825, 9.525, -39.898979486), x_dir=(0, 0, 1), z_dir=(1, 0, 0)) * Cylinder(2, 341, mode=Mode.PRIVATE)
    fillet1_piece_1 = split(fillet1_piece_1, bisect_by=Plane(origin=(13.095089825, 10.807057583, -30), z_dir=(0, 0, -1)), keep=Keep.TOP, mode=Mode.PRIVATE)
    add(fillet1_piece_1)
    with BuildSketch(Plane(origin=(13.5, 17, -62.5), x_dir=(0, -1, 0), z_dir=(0, 0, 1))) as fillet1_piece_2_section:
        with BuildLine():
            CenterArc((FILLET1_R, -FILLET1_R), FILLET1_R, 90, 90)
            Line((0, -FILLET1_R), (0, 0))
            Line((0, 0), (FILLET1_R, 0))
        make_face()
    fillet1_piece_2 = extrude(amount=125, mode=Mode.PRIVATE)
    fillet1_piece_2 = split(fillet1_piece_2, bisect_by=Plane(origin=(11.059751506, 12, 0), z_dir=(0, 1, 0)), keep=Keep.TOP, mode=Mode.PRIVATE)
    add(fillet1_piece_2)
    with BuildSketch(Plane(origin=(13.5, 17, -87.5), x_dir=(0, -1, 0), z_dir=(0, 0, 1))) as fillet1_piece_3_section:
        with BuildLine():
            CenterArc((FILLET1_R, -FILLET1_R), FILLET1_R, 90, 90)
            Line((0, -FILLET1_R), (0, 0))
            Line((0, 0), (FILLET1_R, 0))
        make_face()
    fillet1_piece_3 = extrude(amount=150, mode=Mode.PRIVATE)
    fillet1_piece_3 = fillet1_piece_3 - Plane(origin=(13.095089825, 9.525, 39.898979486), x_dir=(0, 0, -1), z_dir=(1, 0, 0)) * Cylinder(2, 341, mode=Mode.PRIVATE)
    fillet1_piece_3 = split(fillet1_piece_3, bisect_by=Plane(origin=(13.095089825, 10.807057583, 30), z_dir=(0, 0, 1)), keep=Keep.TOP, mode=Mode.PRIVATE)
    add(fillet1_piece_3)
    with BuildSketch(Plane(origin=(13.5, -17, 62.5), x_dir=(-1, 0, 0), z_dir=(0, 0, -1))) as fillet1_piece_4_section:
        with BuildLine():
            CenterArc((FILLET1_R, FILLET1_R), FILLET1_R, 180, 90)
            Line((0, FILLET1_R), (0, 0))
            Line((0, 0), (FILLET1_R, 0))
        make_face()
    fillet1_piece_4 = extrude(amount=125, mode=Mode.PRIVATE)
    fillet1_piece_4 = split(fillet1_piece_4, bisect_by=Plane(origin=(11.059751506, -12, 46.25), z_dir=(0, -1, 0)), keep=Keep.TOP, mode=Mode.PRIVATE)
    add(fillet1_piece_4)
    with BuildSketch(Plane(origin=(13.5, -17, 62.5), x_dir=(-1, 0, 0), z_dir=(0, 0, -1))) as fillet1_piece_5_section:
        with BuildLine():
            CenterArc((FILLET1_R, FILLET1_R), FILLET1_R, 180, 90)
            Line((0, FILLET1_R), (0, 0))
            Line((0, 0), (FILLET1_R, 0))
        make_face()
    fillet1_piece_5 = extrude(amount=150, mode=Mode.PRIVATE)
    fillet1_piece_5 = split(fillet1_piece_5, bisect_by=Plane(origin=(13.095085978, -10.807036513, 30), z_dir=(0, 0, 1)), keep=Keep.TOP, mode=Mode.PRIVATE)
    fillet1_piece_5 = fillet1_piece_5 - Plane(origin=(13.095085978, -9.525, 39.898979486), x_dir=(0, 0, -1), z_dir=(1, 0, 0)) * Cylinder(2, 341, mode=Mode.PRIVATE)
    add(fillet1_piece_5)
    with BuildSketch(Plane(origin=(13.5, -17, 87.5), x_dir=(-1, 0, 0), z_dir=(0, 0, -1))) as fillet1_piece_6_section:
        with BuildLine():
            CenterArc((FILLET1_R, FILLET1_R), FILLET1_R, 180, 90)
            Line((0, FILLET1_R), (0, 0))
            Line((0, 0), (FILLET1_R, 0))
        make_face()
    fillet1_piece_6 = extrude(amount=150, mode=Mode.PRIVATE)
    fillet1_piece_6 = split(fillet1_piece_6, bisect_by=Plane(origin=(13.095085978, -10.807036513, -30), z_dir=(0, 0, -1)), keep=Keep.TOP, mode=Mode.PRIVATE)
    fillet1_piece_6 = fillet1_piece_6 - Plane(origin=(13.095085978, -9.525, -39.898979486), x_dir=(0, 0, 1), z_dir=(1, 0, 0)) * Cylinder(2, 341, mode=Mode.PRIVATE)
    add(fillet1_piece_6)


solid = part.part
